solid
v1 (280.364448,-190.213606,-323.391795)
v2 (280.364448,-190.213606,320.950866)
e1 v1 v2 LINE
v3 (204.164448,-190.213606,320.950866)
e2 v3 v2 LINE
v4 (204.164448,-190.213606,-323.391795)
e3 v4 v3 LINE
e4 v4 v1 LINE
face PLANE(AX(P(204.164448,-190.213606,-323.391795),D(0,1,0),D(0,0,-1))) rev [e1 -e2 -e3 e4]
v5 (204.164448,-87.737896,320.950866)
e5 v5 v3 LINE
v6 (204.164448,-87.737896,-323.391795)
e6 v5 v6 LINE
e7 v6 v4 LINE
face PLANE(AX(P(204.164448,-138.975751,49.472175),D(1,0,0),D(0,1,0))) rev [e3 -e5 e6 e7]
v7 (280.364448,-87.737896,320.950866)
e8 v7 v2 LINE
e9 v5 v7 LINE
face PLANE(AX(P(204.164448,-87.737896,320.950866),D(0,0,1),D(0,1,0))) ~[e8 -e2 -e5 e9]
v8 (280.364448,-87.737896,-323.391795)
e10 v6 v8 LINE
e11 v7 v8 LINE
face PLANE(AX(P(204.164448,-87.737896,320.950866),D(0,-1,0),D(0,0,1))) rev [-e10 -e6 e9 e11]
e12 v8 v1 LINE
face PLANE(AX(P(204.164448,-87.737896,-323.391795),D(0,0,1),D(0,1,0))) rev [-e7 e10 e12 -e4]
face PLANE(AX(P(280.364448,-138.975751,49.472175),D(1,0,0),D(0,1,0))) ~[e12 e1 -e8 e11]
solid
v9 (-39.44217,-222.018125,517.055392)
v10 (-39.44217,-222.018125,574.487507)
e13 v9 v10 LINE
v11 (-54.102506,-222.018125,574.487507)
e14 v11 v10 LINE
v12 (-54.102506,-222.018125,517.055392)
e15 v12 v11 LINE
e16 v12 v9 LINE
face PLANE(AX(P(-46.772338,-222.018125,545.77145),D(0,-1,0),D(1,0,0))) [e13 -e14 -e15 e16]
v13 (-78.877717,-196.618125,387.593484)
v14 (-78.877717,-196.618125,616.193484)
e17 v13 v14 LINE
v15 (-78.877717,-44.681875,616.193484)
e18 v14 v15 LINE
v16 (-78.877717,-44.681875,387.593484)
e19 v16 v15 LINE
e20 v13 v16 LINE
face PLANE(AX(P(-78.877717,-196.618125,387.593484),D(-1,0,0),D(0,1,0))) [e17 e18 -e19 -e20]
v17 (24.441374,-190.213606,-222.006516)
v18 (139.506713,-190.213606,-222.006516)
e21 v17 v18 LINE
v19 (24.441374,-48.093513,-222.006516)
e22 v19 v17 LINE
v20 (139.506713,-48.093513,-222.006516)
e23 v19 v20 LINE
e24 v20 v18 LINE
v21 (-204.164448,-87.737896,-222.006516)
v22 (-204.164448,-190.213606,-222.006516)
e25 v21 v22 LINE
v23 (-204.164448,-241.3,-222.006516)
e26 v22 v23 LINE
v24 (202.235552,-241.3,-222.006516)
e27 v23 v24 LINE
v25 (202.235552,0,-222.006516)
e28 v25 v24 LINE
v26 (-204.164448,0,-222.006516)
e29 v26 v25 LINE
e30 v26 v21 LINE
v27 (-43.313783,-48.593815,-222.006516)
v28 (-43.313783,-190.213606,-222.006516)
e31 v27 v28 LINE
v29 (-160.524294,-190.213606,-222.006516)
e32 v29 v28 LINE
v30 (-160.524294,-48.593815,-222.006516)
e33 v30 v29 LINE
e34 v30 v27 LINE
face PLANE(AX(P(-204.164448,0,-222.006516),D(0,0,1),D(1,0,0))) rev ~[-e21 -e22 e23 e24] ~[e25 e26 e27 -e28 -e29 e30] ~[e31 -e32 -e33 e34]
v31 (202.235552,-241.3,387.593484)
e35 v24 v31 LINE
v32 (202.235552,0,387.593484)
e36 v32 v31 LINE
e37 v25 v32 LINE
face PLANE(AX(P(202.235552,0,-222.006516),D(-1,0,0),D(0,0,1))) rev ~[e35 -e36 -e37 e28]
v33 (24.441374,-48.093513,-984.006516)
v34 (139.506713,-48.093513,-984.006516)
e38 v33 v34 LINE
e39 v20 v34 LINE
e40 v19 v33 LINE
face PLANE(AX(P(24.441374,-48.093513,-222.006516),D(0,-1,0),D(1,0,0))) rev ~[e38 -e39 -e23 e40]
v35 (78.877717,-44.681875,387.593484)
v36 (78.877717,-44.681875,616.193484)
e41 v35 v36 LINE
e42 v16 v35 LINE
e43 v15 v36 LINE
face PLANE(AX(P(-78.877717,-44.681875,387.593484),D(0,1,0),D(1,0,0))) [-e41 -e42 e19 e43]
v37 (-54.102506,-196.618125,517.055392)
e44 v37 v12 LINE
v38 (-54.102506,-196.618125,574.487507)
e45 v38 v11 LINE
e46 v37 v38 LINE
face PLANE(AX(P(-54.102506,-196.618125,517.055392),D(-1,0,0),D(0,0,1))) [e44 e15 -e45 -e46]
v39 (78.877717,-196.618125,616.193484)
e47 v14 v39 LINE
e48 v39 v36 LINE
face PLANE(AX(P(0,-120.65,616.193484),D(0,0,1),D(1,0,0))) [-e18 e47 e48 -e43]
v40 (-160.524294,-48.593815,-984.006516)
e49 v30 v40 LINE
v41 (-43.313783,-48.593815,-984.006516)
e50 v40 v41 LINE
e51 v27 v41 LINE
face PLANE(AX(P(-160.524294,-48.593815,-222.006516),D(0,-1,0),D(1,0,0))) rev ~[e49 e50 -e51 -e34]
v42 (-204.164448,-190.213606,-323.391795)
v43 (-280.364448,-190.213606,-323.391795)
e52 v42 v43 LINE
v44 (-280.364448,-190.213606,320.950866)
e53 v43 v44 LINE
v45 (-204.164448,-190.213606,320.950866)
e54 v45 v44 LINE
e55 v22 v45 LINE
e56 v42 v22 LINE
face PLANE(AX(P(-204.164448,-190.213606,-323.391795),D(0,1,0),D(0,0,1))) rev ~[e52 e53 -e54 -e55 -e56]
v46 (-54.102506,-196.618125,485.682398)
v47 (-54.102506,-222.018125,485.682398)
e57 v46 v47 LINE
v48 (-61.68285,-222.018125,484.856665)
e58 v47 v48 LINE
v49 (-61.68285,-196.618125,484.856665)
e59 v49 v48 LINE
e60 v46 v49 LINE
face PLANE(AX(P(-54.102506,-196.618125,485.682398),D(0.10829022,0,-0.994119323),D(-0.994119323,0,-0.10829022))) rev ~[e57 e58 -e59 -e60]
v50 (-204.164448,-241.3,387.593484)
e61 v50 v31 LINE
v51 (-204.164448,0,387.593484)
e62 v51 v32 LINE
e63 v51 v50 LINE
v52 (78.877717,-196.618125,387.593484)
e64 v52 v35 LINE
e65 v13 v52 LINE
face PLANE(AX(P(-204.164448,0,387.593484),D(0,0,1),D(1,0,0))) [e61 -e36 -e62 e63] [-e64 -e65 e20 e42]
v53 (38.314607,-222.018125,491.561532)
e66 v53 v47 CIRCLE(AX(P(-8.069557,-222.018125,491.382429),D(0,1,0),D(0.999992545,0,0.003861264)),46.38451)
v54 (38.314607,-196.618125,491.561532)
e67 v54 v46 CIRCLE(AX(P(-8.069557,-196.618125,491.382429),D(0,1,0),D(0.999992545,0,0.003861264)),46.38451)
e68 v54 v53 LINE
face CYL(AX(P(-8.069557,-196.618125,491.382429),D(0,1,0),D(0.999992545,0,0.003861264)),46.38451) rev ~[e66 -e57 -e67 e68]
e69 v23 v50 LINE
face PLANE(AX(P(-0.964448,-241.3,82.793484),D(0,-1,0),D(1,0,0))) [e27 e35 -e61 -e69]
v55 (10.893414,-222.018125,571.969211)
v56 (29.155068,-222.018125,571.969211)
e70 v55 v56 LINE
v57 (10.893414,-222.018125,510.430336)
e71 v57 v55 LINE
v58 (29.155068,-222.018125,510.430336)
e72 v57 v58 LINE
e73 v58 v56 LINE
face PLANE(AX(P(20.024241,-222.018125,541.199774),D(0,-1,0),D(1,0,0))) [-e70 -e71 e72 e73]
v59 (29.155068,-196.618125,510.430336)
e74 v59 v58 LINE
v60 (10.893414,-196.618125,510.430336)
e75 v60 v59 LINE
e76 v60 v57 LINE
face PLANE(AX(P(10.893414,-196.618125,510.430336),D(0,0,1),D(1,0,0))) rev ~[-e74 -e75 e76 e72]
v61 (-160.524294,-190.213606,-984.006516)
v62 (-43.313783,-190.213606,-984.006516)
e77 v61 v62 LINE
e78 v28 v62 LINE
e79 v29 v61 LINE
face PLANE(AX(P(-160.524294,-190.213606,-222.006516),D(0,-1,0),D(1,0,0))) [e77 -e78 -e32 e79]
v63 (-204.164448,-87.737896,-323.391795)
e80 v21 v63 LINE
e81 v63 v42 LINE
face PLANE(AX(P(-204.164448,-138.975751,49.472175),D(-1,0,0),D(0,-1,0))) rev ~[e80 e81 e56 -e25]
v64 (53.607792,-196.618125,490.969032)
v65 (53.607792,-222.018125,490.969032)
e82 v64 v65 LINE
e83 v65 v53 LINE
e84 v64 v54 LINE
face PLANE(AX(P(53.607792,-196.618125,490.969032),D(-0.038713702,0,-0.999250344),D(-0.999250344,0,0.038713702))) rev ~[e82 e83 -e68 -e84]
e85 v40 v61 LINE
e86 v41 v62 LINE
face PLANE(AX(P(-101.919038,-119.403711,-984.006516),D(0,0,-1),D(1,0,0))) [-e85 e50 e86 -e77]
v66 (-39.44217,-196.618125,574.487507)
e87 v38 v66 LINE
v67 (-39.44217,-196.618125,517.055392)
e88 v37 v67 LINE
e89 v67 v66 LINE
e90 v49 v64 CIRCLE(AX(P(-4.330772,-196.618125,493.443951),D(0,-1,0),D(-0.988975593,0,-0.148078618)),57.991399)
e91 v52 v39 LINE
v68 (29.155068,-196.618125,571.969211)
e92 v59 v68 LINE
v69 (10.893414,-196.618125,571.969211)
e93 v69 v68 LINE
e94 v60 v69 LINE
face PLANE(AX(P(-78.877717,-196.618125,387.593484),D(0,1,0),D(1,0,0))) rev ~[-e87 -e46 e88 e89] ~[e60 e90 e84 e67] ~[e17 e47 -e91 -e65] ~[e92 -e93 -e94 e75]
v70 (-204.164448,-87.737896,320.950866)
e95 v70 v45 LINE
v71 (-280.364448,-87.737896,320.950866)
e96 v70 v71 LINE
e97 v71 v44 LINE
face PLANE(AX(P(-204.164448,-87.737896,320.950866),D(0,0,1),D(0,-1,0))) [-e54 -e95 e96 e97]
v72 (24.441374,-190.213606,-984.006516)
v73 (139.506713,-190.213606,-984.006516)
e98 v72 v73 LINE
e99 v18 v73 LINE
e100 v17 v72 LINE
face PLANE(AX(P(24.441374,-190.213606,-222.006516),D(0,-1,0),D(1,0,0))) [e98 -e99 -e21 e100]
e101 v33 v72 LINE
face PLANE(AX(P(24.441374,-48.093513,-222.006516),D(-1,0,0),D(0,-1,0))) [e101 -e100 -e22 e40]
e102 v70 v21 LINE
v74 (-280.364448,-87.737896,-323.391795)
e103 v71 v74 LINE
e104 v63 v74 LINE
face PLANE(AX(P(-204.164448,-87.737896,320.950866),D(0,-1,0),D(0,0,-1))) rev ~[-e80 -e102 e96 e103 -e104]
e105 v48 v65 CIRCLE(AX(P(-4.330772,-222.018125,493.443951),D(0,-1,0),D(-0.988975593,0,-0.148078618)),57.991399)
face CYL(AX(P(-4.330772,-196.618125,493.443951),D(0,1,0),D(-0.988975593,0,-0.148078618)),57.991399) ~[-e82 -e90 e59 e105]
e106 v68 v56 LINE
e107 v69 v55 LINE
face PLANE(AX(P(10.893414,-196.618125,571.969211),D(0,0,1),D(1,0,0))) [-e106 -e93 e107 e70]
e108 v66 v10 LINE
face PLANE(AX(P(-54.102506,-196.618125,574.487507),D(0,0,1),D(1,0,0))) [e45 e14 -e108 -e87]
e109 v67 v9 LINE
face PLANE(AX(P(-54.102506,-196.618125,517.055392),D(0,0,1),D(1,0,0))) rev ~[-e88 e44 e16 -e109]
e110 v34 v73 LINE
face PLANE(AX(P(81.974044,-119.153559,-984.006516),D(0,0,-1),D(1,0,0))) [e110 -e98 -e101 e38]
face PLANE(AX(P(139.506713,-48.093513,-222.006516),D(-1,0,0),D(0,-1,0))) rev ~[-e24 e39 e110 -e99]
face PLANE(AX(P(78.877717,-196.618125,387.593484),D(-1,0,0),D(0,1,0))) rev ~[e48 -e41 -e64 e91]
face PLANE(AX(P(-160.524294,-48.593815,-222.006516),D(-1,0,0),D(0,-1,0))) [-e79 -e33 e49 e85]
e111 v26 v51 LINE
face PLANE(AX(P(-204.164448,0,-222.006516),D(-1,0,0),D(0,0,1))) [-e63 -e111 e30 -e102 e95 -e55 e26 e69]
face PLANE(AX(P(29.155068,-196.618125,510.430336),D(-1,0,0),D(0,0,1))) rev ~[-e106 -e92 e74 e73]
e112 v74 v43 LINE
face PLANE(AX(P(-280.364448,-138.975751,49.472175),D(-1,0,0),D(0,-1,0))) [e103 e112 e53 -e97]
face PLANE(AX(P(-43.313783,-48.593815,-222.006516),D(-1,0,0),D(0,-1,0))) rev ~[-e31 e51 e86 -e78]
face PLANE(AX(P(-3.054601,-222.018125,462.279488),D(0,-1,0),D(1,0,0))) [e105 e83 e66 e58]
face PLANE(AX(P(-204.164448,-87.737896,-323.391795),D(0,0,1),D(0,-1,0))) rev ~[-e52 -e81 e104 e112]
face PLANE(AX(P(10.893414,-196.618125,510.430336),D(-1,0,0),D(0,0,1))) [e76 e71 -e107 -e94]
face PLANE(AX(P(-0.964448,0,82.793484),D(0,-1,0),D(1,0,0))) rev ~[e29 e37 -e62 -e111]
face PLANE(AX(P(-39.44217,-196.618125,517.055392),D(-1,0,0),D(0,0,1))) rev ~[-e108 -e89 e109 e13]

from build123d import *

# Parameters (mm, degrees)
F0_W     = 406.4
F0_H     = 609.6
F1_DEPTH = 241.3
F2_W     = 157.7554345131
F2_H     = 151.9362496853
F3_DEPTH = 228.6
F4_W     = 102.4757102132
F4_H     = 542.9573820229
F4_H_2   = 101.385278881
F5_DEPTH = 76.2
F6_W     = 117.2105111182
F6_H     = 141.6197903454
F6_W_2   = 115.0653380901
F6_H_2   = 142.1200931072
F7_DEPTH = 762
F8_W     = 14.6603360772
F8_H     = 57.432115078
F8_W_2   = 18.2616543025
F8_H_2   = 61.538875103
F9_DEPTH = 25.4


# Not quite as in the source:
# - a pattern or mirror of a feature is missing from the dataset's text; its kind, count and spacing are read off the source's solid


with BuildPart() as f1:
    # F0 (on Front) → F1 (new body)
    with BuildSketch(Plane.XZ):
        with Locations((-0.9644478559, 82.7934837226)):
            Rectangle(F0_W, F0_H)
    extrude(amount=F1_DEPTH)

    # F2 (on face) → F3 (join)
    with BuildSketch(Plane.XY.offset(387.5934837226)):
        with Locations((0, -120.65)):
            Rectangle(F2_W, F2_H)
    extrude(amount=F3_DEPTH)

    # F4 (on face) → F5 (join)
    with BuildSketch(Plane(origin=(-204.1644478559, 0, 0), x_dir=(0, -1, 0), z_dir=(-1, 0, 0))):
        with Locations((138.9757506549, 49.4721747341)):
            Rectangle(F4_W, F4_H)
        with Locations((138.9757506549, -272.6991557179)):
            Rectangle(F4_W, F4_H_2)
    f5 = extrude(amount=F5_DEPTH)

    # F5_copies: F5 across plane
    add(f5.mirror(Plane(origin=(0, 0, 0), x_dir=(0, 0, 1), z_dir=(1, 0, 0))))

    # F6 (on face) → F7 (join)
    with BuildSketch(Plane(origin=(0, 0, -222.0065162774), x_dir=(1, 0, 0), z_dir=(0, 0, -1))):
        with Locations((-101.9190382212, 119.4037105888)):
            Rectangle(F6_W, F6_H)
        with Locations((81.9740435109, 119.1535592079)):
            Rectangle(F6_W_2, F6_H_2)
    extrude(amount=F7_DEPTH)

    # F8 (on face) → F9 (join)
    with BuildSketch(Plane.XZ.offset(196.6181248426)):
        with Locations((-46.77233845, 545.7714498043)):
            Rectangle(F8_W, F8_H)
        with Locations((20.0242409483, 541.19977355)):
            Rectangle(F8_W_2, F8_H_2)
        with BuildLine():
            Line((-54.1025064886, 485.6823980808), (-61.6828501225, 484.8566651344))
            ThreePointArc((-61.6828501225, 484.8566651344), (-1.2605522205, 435.5338821249), (53.6077916622, 490.9690320492))
            Line((53.6077916622, 490.9690320492), (38.3146069944, 491.5615320206))
            ThreePointArc((38.3146069944, 491.5615320206), (-5.1247496202, 445.0914918544), (-54.1025064886, 485.6823980808))
        make_face()
    extrude(amount=F9_DEPTH)


solid = f1.part
